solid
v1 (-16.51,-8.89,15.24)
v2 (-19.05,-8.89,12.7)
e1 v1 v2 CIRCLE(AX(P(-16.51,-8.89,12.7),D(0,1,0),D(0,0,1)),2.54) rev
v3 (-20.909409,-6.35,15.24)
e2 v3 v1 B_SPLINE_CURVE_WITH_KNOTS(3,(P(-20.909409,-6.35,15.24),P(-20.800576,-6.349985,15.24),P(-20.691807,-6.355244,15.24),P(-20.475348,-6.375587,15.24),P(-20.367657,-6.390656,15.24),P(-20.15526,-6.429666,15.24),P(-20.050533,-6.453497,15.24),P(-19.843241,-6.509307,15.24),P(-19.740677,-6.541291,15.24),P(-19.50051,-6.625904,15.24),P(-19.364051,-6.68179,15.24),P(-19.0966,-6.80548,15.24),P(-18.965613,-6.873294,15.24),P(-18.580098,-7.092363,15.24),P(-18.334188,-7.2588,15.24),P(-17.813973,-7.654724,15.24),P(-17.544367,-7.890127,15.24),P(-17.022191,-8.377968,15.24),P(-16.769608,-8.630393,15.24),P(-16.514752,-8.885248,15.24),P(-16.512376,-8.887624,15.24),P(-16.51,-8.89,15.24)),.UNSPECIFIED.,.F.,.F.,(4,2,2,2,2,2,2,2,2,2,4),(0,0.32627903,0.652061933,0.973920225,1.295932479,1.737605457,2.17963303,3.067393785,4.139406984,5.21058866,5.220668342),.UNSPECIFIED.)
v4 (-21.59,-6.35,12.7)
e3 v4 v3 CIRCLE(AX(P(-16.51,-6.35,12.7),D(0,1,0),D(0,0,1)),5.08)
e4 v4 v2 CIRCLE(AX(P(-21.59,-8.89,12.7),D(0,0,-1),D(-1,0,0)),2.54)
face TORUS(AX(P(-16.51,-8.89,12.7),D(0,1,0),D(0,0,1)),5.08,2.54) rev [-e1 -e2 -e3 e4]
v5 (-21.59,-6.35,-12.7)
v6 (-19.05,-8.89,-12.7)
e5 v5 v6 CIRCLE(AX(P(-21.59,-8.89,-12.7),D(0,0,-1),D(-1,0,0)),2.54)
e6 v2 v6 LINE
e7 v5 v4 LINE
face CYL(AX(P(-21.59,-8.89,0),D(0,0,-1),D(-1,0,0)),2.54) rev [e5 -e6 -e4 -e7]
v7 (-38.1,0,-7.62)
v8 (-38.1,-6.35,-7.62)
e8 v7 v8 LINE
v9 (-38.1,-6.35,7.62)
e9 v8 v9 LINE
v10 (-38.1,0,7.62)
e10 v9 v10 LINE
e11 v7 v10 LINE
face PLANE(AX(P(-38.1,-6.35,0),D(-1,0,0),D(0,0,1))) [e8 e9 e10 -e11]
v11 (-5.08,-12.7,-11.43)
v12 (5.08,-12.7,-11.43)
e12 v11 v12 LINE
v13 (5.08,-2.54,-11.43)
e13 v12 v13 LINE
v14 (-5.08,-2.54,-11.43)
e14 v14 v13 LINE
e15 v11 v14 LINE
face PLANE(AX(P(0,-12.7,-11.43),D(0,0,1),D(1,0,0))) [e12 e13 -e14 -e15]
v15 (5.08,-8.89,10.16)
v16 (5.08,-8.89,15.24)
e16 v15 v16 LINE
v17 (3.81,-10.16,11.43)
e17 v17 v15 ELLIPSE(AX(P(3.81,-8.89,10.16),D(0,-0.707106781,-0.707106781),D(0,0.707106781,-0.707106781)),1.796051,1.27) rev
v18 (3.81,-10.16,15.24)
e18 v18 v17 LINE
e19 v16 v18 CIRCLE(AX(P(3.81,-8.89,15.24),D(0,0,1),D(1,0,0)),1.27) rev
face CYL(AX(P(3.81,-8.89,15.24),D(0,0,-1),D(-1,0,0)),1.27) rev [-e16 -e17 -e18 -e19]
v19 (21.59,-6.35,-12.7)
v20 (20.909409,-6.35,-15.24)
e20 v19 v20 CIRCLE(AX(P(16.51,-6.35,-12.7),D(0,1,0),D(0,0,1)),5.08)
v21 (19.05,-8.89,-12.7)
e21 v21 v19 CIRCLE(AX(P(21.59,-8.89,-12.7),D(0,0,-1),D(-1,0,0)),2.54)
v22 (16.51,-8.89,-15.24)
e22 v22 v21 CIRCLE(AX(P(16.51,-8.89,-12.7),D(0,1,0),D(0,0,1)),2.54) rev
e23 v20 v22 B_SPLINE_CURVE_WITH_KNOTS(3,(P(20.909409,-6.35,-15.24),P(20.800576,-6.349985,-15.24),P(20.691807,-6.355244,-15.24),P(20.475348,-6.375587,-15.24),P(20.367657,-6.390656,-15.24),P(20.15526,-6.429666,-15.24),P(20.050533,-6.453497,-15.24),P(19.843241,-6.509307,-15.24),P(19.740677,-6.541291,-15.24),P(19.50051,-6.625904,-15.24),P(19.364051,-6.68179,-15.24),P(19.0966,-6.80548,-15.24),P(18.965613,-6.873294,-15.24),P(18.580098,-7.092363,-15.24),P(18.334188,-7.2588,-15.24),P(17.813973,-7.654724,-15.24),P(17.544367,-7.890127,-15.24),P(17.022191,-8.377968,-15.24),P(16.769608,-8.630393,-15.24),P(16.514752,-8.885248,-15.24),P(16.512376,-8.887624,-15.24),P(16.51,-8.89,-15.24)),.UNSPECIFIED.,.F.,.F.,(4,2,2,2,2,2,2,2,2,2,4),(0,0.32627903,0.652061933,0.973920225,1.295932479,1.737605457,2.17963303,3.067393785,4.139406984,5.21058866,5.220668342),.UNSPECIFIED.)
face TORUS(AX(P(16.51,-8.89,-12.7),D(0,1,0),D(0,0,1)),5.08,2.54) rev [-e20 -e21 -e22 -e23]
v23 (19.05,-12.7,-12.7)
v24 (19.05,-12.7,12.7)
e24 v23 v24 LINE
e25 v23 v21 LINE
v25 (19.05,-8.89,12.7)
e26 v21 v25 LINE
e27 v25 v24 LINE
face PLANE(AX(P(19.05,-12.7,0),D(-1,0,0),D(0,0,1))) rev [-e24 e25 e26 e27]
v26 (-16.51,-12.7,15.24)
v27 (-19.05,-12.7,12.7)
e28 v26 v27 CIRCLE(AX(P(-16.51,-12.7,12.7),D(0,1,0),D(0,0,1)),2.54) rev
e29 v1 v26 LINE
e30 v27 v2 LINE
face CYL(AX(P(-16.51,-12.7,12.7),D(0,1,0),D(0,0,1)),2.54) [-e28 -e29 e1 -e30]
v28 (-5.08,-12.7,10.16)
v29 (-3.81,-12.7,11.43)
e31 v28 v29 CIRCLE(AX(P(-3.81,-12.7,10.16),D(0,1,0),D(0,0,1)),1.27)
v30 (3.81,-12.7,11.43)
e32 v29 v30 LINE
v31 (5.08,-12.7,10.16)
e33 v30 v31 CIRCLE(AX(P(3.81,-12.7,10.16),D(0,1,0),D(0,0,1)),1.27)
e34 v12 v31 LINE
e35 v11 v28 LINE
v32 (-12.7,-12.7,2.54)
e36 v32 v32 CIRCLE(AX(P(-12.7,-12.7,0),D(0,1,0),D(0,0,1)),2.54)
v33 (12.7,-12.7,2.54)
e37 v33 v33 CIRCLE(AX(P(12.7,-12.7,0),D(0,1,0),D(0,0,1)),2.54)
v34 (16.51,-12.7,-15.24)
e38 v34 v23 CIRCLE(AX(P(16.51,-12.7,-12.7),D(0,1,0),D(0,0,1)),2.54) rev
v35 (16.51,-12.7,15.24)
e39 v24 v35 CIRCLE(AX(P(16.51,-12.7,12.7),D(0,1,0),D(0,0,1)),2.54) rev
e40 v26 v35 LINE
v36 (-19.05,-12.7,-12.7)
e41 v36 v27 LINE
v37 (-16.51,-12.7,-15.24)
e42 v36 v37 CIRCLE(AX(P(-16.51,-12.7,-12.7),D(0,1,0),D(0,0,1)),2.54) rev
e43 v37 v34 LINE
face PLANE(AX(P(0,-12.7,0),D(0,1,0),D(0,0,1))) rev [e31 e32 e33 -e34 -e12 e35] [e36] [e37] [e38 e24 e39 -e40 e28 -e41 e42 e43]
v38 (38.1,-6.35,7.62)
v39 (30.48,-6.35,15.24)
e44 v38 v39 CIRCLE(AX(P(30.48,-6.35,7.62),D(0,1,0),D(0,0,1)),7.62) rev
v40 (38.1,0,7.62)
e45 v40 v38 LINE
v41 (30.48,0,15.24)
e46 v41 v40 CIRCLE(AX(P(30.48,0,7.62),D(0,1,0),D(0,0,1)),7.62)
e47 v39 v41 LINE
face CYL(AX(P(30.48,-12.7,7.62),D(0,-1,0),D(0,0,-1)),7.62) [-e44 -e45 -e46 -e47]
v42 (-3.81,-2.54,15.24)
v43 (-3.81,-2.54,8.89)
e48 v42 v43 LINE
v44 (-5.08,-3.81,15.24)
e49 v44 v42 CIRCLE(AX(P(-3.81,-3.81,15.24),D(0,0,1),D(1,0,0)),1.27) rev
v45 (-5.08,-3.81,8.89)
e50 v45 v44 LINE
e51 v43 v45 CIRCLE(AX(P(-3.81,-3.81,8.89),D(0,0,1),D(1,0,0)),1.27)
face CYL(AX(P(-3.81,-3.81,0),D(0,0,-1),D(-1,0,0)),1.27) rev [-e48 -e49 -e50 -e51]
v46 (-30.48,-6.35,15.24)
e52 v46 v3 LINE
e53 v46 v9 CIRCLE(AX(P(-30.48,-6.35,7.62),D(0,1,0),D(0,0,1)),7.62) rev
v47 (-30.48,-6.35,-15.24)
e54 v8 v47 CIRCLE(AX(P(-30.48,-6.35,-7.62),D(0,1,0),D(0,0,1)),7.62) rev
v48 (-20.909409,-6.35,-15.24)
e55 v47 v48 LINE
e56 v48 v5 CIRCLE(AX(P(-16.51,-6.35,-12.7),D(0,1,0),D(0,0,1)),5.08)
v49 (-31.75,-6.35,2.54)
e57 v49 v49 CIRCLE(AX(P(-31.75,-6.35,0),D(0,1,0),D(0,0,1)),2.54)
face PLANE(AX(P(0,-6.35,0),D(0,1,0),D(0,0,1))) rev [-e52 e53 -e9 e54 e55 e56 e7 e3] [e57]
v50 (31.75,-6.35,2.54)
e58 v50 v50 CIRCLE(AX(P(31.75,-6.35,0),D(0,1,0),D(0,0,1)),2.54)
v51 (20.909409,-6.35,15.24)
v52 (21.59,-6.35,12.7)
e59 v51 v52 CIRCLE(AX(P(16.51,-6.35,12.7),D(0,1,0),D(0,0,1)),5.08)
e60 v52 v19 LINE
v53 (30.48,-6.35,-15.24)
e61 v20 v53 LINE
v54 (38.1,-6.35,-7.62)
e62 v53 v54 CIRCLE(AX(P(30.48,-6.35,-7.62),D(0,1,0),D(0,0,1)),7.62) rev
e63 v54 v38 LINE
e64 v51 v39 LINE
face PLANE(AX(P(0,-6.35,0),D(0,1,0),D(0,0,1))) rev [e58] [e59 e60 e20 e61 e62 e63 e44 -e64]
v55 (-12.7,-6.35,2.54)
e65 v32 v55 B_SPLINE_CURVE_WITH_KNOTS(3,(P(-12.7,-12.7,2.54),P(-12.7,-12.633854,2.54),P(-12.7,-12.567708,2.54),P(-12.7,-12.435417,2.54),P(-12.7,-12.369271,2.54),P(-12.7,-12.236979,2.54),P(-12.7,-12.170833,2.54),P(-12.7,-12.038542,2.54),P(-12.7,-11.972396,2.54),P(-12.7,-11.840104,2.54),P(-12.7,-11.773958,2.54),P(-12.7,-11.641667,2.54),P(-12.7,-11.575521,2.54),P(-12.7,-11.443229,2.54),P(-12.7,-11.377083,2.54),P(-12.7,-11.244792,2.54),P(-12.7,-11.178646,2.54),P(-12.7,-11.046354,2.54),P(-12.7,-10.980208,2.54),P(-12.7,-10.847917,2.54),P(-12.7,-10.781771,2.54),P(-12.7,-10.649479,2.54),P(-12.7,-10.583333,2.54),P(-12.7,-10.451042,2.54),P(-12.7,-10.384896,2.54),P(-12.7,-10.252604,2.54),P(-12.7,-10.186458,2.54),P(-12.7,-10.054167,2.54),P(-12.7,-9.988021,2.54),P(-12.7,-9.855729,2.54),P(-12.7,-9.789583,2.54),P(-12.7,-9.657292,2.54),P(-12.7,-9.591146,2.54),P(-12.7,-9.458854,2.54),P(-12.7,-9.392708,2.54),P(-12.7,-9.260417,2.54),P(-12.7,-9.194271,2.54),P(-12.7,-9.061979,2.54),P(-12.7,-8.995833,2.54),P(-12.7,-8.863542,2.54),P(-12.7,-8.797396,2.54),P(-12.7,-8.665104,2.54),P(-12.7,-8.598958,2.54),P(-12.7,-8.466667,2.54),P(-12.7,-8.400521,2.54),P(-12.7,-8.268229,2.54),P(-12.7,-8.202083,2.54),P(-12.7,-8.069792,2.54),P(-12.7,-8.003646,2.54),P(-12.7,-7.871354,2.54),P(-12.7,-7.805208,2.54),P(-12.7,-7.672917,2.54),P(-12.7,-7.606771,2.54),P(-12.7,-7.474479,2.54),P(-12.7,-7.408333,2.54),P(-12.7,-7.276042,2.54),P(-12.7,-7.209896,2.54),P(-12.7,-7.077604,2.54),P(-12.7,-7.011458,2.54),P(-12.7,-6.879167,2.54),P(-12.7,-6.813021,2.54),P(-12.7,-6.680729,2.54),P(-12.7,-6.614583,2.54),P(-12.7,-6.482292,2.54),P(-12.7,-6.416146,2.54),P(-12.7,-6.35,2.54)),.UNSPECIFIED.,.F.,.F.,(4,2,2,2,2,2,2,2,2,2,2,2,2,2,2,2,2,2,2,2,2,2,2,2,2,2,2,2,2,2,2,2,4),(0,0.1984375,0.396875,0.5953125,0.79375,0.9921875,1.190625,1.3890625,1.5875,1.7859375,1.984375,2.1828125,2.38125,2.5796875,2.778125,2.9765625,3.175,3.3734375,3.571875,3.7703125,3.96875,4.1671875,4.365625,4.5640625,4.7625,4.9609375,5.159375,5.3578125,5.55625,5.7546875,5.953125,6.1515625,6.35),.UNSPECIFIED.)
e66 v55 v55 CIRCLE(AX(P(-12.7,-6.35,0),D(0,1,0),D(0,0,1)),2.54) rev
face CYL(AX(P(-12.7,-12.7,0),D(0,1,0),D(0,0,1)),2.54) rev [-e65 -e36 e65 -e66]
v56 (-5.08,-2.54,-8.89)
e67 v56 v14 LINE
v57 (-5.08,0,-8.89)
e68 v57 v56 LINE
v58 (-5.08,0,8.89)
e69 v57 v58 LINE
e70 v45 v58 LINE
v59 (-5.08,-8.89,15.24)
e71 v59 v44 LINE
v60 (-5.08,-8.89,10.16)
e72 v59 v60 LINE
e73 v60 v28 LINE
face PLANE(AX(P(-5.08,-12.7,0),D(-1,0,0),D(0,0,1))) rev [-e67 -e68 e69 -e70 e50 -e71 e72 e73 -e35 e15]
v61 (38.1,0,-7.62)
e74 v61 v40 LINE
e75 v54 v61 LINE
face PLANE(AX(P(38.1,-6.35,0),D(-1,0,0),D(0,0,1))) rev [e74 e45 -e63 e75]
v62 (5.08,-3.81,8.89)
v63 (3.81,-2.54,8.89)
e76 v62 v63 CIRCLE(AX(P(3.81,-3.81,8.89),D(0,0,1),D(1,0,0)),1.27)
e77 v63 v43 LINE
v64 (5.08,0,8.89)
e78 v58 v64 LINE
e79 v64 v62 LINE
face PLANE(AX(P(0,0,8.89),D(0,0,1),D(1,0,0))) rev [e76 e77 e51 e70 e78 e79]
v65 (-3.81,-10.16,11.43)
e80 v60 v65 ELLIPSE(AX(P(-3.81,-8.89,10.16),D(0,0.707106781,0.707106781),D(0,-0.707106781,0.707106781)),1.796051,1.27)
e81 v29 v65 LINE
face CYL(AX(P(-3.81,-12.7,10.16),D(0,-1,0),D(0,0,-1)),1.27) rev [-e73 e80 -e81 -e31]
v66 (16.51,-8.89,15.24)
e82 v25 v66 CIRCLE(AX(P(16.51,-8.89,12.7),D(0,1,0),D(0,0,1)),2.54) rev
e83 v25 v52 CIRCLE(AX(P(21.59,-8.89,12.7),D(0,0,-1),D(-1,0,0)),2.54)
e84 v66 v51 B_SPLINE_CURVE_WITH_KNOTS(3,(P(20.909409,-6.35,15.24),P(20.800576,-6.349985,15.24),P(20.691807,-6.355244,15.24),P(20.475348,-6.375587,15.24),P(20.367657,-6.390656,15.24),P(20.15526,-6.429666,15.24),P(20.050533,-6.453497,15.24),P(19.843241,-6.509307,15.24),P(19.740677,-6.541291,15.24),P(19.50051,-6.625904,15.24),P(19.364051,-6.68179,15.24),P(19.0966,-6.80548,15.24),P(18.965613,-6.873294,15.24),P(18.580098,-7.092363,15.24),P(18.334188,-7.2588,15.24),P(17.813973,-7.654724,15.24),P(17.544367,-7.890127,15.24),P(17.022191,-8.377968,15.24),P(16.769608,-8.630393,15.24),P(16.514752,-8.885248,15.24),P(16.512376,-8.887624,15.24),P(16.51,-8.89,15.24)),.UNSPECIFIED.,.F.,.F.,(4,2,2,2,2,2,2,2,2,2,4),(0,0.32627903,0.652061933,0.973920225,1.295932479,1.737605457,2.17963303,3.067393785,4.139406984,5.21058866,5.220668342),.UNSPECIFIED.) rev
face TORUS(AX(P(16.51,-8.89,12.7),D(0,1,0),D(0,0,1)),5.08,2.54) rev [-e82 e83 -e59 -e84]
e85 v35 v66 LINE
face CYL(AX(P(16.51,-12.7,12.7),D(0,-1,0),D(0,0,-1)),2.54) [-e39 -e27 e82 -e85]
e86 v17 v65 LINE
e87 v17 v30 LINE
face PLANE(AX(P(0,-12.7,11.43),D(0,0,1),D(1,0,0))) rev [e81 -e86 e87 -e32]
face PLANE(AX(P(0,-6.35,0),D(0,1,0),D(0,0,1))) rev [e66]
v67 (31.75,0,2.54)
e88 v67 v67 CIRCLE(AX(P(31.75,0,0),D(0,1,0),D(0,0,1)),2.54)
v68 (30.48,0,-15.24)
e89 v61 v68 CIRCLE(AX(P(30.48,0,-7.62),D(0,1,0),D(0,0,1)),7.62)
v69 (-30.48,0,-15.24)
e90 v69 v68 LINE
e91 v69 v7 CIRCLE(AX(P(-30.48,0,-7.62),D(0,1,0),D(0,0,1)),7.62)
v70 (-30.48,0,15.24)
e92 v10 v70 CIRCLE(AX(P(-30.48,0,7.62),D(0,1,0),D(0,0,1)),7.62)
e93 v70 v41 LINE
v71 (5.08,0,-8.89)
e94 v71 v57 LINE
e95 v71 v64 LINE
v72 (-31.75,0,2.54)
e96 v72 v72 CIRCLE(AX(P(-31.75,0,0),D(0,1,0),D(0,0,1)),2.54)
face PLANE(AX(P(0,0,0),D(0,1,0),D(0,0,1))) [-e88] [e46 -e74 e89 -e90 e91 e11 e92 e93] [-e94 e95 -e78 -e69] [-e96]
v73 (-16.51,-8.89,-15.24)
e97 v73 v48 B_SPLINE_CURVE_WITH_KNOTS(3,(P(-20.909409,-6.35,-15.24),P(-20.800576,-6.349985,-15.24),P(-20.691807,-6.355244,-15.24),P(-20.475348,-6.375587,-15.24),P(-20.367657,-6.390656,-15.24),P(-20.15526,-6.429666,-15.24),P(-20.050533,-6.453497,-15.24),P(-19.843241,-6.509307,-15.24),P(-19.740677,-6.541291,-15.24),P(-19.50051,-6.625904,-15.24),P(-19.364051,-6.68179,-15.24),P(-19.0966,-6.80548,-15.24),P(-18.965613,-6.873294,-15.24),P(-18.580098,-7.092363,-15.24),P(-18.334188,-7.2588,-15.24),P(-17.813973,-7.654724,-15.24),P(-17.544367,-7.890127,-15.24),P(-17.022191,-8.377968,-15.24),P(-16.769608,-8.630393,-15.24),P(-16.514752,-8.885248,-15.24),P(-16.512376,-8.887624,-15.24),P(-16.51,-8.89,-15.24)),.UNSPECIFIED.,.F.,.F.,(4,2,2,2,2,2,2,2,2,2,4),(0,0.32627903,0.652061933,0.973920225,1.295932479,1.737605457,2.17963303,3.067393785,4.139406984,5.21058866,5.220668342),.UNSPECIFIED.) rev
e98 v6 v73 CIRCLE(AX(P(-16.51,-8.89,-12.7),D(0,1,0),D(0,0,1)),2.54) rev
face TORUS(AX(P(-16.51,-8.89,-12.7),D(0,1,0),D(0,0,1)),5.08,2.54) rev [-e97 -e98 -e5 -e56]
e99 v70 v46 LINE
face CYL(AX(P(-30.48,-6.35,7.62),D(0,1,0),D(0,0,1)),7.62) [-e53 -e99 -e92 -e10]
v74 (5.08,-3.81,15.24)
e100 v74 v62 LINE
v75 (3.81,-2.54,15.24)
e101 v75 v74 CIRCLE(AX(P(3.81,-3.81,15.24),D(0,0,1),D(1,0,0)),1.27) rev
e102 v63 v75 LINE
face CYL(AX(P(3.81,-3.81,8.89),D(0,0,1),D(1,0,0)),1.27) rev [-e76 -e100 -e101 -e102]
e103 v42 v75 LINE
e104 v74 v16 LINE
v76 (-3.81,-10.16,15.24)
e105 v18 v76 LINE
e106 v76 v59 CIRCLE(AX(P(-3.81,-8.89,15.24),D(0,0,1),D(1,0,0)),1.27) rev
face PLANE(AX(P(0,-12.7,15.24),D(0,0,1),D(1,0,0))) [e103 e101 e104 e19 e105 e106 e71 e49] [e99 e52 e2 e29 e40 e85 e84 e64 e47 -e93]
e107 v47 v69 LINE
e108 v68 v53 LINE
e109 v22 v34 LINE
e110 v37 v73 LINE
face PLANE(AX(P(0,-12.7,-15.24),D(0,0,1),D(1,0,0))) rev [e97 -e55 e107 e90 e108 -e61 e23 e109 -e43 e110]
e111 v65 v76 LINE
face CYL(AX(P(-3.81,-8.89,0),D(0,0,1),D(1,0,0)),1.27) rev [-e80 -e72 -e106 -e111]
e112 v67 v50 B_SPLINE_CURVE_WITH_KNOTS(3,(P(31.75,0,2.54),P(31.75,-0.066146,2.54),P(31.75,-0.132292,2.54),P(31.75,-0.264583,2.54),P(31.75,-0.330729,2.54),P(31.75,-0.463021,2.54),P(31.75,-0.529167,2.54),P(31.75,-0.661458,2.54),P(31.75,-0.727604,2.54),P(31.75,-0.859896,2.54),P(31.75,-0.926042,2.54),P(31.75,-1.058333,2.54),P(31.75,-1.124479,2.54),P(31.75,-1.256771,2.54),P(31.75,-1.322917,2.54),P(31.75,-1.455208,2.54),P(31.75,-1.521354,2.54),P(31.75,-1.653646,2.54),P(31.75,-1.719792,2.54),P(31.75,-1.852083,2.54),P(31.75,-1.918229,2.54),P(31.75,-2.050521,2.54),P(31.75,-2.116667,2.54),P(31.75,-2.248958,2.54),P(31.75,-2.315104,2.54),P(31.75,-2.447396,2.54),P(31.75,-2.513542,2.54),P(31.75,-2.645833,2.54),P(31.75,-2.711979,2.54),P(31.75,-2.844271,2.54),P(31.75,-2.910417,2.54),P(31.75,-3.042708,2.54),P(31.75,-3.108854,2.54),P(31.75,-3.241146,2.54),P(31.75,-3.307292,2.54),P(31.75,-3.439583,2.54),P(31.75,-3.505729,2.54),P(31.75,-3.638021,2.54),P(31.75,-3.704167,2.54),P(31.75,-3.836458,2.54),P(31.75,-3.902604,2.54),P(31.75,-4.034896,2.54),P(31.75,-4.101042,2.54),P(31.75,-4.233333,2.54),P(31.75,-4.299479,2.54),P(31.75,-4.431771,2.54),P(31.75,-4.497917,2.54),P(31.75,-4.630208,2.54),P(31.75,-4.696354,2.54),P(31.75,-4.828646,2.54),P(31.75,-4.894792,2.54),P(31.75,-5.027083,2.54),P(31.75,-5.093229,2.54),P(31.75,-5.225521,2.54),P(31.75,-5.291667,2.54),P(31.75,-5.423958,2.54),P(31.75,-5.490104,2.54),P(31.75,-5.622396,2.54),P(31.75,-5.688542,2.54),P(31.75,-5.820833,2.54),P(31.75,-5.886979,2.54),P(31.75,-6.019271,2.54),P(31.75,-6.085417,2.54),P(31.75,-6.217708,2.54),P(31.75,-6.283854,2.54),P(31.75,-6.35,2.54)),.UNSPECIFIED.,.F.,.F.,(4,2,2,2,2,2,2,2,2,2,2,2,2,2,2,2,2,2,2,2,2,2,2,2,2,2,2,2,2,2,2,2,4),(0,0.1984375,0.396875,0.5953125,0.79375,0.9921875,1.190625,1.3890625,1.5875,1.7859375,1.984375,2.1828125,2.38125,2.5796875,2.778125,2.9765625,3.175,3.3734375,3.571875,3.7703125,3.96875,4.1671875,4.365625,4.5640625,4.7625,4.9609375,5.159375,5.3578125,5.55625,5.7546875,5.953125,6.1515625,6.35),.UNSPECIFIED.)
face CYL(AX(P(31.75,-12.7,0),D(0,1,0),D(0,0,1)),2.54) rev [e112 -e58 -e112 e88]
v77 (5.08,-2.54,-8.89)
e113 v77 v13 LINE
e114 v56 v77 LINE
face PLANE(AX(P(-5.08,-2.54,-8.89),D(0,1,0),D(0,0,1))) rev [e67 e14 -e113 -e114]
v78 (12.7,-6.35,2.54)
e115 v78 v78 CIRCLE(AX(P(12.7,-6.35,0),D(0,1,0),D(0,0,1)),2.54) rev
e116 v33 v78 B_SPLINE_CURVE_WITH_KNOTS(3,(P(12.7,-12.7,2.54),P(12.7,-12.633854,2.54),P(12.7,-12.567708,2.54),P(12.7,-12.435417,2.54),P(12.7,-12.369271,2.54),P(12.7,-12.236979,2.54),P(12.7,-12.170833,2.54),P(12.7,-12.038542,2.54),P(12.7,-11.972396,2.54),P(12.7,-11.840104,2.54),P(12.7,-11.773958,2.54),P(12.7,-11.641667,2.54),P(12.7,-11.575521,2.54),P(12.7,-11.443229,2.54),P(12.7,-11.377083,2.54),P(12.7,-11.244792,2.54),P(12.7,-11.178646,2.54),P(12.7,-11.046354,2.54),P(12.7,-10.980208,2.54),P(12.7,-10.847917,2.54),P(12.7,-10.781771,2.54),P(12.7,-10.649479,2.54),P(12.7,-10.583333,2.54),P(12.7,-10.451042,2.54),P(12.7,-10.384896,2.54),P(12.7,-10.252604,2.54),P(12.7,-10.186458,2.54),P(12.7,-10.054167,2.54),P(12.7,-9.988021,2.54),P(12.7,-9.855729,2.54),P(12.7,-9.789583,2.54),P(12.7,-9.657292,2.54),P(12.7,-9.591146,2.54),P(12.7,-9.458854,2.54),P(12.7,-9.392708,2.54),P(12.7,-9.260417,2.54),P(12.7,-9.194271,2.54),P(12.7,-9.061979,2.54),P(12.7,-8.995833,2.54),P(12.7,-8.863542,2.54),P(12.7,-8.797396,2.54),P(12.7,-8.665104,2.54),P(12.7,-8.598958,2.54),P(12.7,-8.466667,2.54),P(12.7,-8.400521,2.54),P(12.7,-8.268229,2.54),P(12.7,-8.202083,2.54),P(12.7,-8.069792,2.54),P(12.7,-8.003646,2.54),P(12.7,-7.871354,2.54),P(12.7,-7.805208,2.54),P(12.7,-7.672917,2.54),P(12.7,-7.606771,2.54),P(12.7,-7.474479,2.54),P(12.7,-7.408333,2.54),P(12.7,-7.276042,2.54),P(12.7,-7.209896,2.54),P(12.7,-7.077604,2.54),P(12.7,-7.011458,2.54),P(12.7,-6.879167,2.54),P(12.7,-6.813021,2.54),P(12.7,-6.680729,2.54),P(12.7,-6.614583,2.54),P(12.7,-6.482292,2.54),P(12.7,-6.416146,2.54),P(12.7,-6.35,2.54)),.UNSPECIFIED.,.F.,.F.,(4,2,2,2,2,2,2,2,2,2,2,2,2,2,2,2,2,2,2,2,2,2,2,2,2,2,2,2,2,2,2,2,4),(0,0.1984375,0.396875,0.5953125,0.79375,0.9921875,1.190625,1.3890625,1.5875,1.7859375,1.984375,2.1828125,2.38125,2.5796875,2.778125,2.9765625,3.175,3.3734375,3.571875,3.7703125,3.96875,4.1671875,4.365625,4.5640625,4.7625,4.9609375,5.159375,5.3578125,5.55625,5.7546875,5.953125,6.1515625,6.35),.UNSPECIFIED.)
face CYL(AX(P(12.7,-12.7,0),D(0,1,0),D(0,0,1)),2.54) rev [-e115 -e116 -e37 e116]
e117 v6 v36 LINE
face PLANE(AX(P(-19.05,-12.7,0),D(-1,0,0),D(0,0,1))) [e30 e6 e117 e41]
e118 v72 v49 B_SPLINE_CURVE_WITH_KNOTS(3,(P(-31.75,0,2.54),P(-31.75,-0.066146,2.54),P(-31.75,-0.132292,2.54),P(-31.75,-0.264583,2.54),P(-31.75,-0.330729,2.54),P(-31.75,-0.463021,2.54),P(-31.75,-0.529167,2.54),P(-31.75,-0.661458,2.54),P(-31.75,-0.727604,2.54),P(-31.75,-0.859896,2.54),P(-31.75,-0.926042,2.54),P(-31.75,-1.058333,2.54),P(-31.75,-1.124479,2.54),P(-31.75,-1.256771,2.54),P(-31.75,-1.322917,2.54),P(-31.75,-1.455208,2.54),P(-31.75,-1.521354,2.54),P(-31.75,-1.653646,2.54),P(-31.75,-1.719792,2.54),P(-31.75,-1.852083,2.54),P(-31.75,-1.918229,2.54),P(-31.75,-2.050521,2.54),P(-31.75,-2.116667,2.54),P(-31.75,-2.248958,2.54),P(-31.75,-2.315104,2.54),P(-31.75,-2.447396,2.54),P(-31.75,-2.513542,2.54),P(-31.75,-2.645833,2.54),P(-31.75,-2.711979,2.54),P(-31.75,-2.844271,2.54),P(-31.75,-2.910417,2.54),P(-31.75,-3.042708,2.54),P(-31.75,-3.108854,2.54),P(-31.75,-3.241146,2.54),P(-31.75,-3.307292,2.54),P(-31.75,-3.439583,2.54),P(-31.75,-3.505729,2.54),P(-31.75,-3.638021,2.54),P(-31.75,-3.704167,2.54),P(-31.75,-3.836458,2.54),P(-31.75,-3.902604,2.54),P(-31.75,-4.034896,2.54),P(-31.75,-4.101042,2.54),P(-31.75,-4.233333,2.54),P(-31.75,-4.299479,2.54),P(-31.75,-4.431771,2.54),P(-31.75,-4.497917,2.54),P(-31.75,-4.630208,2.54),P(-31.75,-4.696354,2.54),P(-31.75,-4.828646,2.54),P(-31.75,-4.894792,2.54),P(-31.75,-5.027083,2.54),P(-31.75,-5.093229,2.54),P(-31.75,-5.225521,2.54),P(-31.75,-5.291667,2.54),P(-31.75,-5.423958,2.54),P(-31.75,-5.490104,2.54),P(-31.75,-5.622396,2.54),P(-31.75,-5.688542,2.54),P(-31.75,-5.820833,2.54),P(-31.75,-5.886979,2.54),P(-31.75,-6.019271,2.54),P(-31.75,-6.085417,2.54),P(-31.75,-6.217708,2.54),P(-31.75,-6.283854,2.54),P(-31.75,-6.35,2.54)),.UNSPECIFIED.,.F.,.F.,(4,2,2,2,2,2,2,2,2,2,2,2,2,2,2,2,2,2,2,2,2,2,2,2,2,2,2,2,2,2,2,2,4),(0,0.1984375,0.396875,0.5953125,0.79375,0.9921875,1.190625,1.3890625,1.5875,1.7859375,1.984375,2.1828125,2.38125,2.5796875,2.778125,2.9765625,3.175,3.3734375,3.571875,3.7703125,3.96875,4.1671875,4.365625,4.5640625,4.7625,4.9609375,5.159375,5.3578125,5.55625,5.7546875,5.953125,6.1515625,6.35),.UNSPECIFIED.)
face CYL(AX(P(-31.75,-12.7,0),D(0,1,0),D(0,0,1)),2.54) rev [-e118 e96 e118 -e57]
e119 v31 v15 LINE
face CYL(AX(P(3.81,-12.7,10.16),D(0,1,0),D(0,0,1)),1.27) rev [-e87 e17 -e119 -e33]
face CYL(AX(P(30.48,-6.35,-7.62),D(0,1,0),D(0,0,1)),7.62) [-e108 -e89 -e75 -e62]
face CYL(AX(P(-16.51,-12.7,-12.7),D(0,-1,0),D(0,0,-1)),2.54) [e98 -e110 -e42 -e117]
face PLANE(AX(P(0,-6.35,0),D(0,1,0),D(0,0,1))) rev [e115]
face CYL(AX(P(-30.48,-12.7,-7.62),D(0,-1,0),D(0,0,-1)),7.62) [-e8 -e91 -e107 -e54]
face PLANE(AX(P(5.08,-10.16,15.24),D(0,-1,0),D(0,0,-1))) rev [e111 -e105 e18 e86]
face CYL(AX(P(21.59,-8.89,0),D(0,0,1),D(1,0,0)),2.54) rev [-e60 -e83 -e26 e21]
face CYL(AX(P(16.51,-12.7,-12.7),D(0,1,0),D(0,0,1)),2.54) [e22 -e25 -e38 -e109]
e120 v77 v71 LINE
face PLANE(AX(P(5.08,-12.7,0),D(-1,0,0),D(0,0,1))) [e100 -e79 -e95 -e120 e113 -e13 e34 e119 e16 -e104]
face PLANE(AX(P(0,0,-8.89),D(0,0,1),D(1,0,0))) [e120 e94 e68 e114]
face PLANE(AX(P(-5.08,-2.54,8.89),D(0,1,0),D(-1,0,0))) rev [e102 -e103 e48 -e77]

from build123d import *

# Parameters (mm, degrees)
SKETCH1_W           = 38.1
SKETCH1_H           = 30.48
SKETCH1_R           = 2.54
SKETCH1_W_2         = 10.16
SKETCH1_H_2         = 22.86
BOSS_EXTRUDE1_DEPTH = 12.7
SKETCH2_W           = 10.16
SKETCH2_H           = 2.54
BOSS_EXTRUDE2_DEPTH = 2.54
SKETCH3_W           = 10.16
SKETCH3_H           = 2.54
BOSS_EXTRUDE3_DEPTH = 2.54
FILLET1_R           = 2.54
SKETCH4_W           = 10.16
SKETCH4_H           = 7.62
CUT_EXTRUDE1_DEPTH  = 36.149415358
FILLET2_R           = 1.27
BOSS_EXTRUDE4_START = -6.35
SKETCH5_R           = 2.54
BOSS_EXTRUDE4_DEPTH = 6.35
SKETCH6_R           = 2.54
CUT_EXTRUDE2_DEPTH  = 43.955297694
FILLET3_R           = 7.62
FILLET4_R           = 2.54


with BuildPart() as part:
    # Sketch1 → Boss-Extrude1 (new body)
    with BuildSketch(Plane(origin=(0, 0, 0), x_dir=(1, 0, 0), z_dir=(0, 1, 0))):
        Rectangle(SKETCH1_W, SKETCH1_H)
        with Locations(Location((12.7, 0, 0), (0, 0, 270))):
            Circle(SKETCH1_R, mode=Mode.SUBTRACT)
        with Locations(Location((-12.7, 0, 0), (0, 0, 270))):
            Circle(SKETCH1_R, mode=Mode.SUBTRACT)
        Rectangle(SKETCH1_W_2, SKETCH1_H_2, mode=Mode.SUBTRACT)
    extrude(amount=-BOSS_EXTRUDE1_DEPTH)

    # Sketch2 → Boss-Extrude2 (add)
    with BuildSketch(Plane.XY.offset(-11.43)):
        with Locations((0, -1.27)):
            Rectangle(SKETCH2_W, SKETCH2_H)
    extrude(amount=BOSS_EXTRUDE2_DEPTH)

    # Sketch3 → Boss-Extrude3 (add)
    with BuildSketch(Plane(origin=(0, 0, 11.43), x_dir=(-1, 0, 0), z_dir=(0, 0, -1))):
        with Locations((0, -1.27)):
            Rectangle(SKETCH3_W, SKETCH3_H)
    extrude(amount=BOSS_EXTRUDE3_DEPTH)

    # Fillet1
    fillet1_edges = [part.edges().sort_by_distance(p)[0] for p in [
        (19.05, -6.35, 15.24),
        (-19.05, -6.35, 15.24),
        (-19.05, -6.35, -15.24),
        (19.05, -6.35, -15.24),
    ]]
    fillet(fillet1_edges, radius=FILLET1_R)

    # Sketch4 → Cut-Extrude1 (cut, through all)
    with BuildSketch(Plane(origin=(0, 0, 11.43), x_dir=(-1, 0, 0), z_dir=(0, 0, -1))):
        with Locations((0, -6.35)):
            Rectangle(SKETCH4_W, SKETCH4_H)
    extrude(amount=-CUT_EXTRUDE1_DEPTH, mode=Mode.SUBTRACT)

    # Fillet2
    fillet2_edges = [part.edges().sort_by_distance(p)[0] for p in [
        (-5.08, -11.43, 11.43),
        (5.08, -11.43, 11.43),
        (-5.08, -2.54, 12.065),
        (5.08, -2.54, 12.065),
        (5.08, -10.16, 13.335),
        (-5.08, -10.16, 13.335),
    ]]
    fillet(fillet2_edges, radius=FILLET2_R)

    # Sketch5 → Boss-Extrude4 (add)
    with BuildSketch(Plane(origin=(0, 0, 0), x_dir=(1, 0, 0), z_dir=(0, 1, 0)).offset(BOSS_EXTRUDE4_START)):
        with BuildLine():
            Line((-16.51, 15.24), (-38.1, 15.24))
            Line((-38.1, 15.24), (-38.1, -15.24))
            Line((-38.1, -15.24), (-16.51, -15.24))
            ThreePointArc((-16.51, -15.24), (-18.306051224, -14.496051224), (-19.05, -12.7))
            Line((-19.05, -12.7), (-19.05, 12.7))
            ThreePointArc((-19.05, 12.7), (-18.306051224, 14.496051224), (-16.51, 15.24))
        make_face()
        with BuildLine():
            Line((38.1, 15.24), (16.51, 15.24))
            ThreePointArc((16.51, 15.24), (18.306051224, 14.496051224), (19.05, 12.7))
            Line((19.05, 12.7), (19.05, -12.7))
            ThreePointArc((19.05, -12.7), (18.306051224, -14.496051224), (16.51, -15.24))
            Line((16.51, -15.24), (38.1, -15.24))
            Line((38.1, -15.24), (38.1, 15.24))
        make_face()
        with Locations(Location((12.7, 0, 0), (0, 0, 270))):
            Circle(SKETCH5_R)
        with Locations(Location((-12.7, 0, 0), (0, 0, 270))):
            Circle(SKETCH5_R)
    extrude(amount=BOSS_EXTRUDE4_DEPTH)

    # Sketch6 → Cut-Extrude2 (cut, through all)
    with BuildSketch(Plane(origin=(0, 0, 0), x_dir=(1, 0, 0), z_dir=(0, 1, 0))):
        with Locations(Location((-31.75, 0, 0), (0, 0, 270))):
            Circle(SKETCH6_R)
        with Locations(Location((31.75, 0, 0), (0, 0, 270))):
            Circle(SKETCH6_R)
    extrude(amount=-CUT_EXTRUDE2_DEPTH, mode=Mode.SUBTRACT)

    # Fillet3
    fillet3_edges = [part.edges().sort_by_distance(p)[0] for p in [
        (38.1, -3.175, 15.24),
        (-38.1, -3.175, 15.24),
        (-38.1, -3.175, -15.24),
        (38.1, -3.175, -15.24),
    ]]
    fillet(fillet3_edges, radius=FILLET3_R)

    # Fillet4
    # the kernel refuses this fillet: 2.54 mm, written as the material it adds along each edge
    with BuildSketch(Plane(origin=(-16.51, -6.35, -12.7), x_dir=(-1, 0, 0), z_dir=(0, 0, 1))) as fillet4_piece_1_section:
        with BuildLine():
            CenterArc((2.54 + FILLET4_R, FILLET4_R), FILLET4_R, 180, 90)
            Line((2.54, FILLET4_R), (2.54, 0))
            Line((2.54, 0), (2.54 + FILLET4_R, 0))
        make_face()
    fillet4_piece_1 = revolve(axis=Axis((-16.51, -6.35, -12.7), (0, -1, 0)), revolution_arc=233.296989237, mode=Mode.PRIVATE)
    fillet4_piece_1 = split(fillet4_piece_1, bisect_by=Plane(origin=(-19.608229137, -6.77494251, -15.24), z_dir=(0, 0, 1)), keep=Keep.TOP, mode=Mode.PRIVATE)
    add(fillet4_piece_1)
    with BuildSketch(Plane(origin=(16.51, -6.35, 12.7), x_dir=(1, 0, 0), z_dir=(0, 0, -1))) as fillet4_piece_2_section:
        with BuildLine():
            CenterArc((2.54 + FILLET4_R, FILLET4_R), FILLET4_R, 180, 90)
            Line((2.54, FILLET4_R), (2.54, 0))
            Line((2.54, 0), (2.54 + FILLET4_R, 0))
        make_face()
    fillet4_piece_2 = revolve(axis=Axis((16.51, -6.35, 12.7), (0, -1, 0)), revolution_arc=233.296989237, mode=Mode.PRIVATE)
    fillet4_piece_2 = split(fillet4_piece_2, bisect_by=Plane(origin=(19.608229137, -6.77494251, 15.24), z_dir=(0, 0, -1)), keep=Keep.TOP, mode=Mode.PRIVATE)
    add(fillet4_piece_2)
    with BuildSketch(Plane(origin=(-16.51, -6.35, 12.7), x_dir=(0.5976672776328222, 0, -0.8017442392976523), z_dir=(-0.8017442392976523, 0, -0.5976672776328222))) as fillet4_piece_3_section:
        with BuildLine():
            CenterArc((2.54 + FILLET4_R, FILLET4_R), FILLET4_R, 180, 90)
            Line((2.54, FILLET4_R), (2.54, 0))
            Line((2.54, 0), (2.54 + FILLET4_R, 0))
        make_face()
    fillet4_piece_3 = revolve(axis=Axis((-16.51, -6.35, 12.7), (0, -1, 0)), revolution_arc=233.296989237, mode=Mode.PRIVATE)
    fillet4_piece_3 = split(fillet4_piece_3, bisect_by=Plane(origin=(-18.414845025, -7.141535935, 15.24), z_dir=(0, 0, -1)), keep=Keep.TOP, mode=Mode.PRIVATE)
    add(fillet4_piece_3)
    with BuildSketch(Plane(origin=(-19.05, -6.35, 12.7), x_dir=(-1, 0, 0), z_dir=(0, 0, -1)), Plane(origin=(19.05, -6.35, -12.7), x_dir=(1, 0, 0), z_dir=(0, 0, 1))) as fillet4_piece_4:
        with BuildLine():
            CenterArc((FILLET4_R, -FILLET4_R), FILLET4_R, 90, 90)
            Line((0, -FILLET4_R), (0, 0))
            Line((0, 0), (FILLET4_R, 0))
        make_face()
    extrude(amount=25.4)
    with BuildSketch(Plane(origin=(16.51, -6.35, -12.7), x_dir=(-0.5976672776328322, 0, 0.8017442392976448), z_dir=(0.8017442392976448, 0, 0.5976672776328322))) as fillet4_piece_5_section:
        with BuildLine():
            CenterArc((2.54 + FILLET4_R, FILLET4_R), FILLET4_R, 180, 90)
            Line((2.54, FILLET4_R), (2.54, 0))
            Line((2.54, 0), (2.54 + FILLET4_R, 0))
        make_face()
    fillet4_piece_5 = revolve(axis=Axis((16.51, -6.35, -12.7), (0, -1, 0)), revolution_arc=233.296989237, mode=Mode.PRIVATE)
    fillet4_piece_5 = split(fillet4_piece_5, bisect_by=Plane(origin=(18.414845035, -7.141535946, -15.24), z_dir=(0, 0, 1)), keep=Keep.TOP, mode=Mode.PRIVATE)
    add(fillet4_piece_5)


solid = part.part
